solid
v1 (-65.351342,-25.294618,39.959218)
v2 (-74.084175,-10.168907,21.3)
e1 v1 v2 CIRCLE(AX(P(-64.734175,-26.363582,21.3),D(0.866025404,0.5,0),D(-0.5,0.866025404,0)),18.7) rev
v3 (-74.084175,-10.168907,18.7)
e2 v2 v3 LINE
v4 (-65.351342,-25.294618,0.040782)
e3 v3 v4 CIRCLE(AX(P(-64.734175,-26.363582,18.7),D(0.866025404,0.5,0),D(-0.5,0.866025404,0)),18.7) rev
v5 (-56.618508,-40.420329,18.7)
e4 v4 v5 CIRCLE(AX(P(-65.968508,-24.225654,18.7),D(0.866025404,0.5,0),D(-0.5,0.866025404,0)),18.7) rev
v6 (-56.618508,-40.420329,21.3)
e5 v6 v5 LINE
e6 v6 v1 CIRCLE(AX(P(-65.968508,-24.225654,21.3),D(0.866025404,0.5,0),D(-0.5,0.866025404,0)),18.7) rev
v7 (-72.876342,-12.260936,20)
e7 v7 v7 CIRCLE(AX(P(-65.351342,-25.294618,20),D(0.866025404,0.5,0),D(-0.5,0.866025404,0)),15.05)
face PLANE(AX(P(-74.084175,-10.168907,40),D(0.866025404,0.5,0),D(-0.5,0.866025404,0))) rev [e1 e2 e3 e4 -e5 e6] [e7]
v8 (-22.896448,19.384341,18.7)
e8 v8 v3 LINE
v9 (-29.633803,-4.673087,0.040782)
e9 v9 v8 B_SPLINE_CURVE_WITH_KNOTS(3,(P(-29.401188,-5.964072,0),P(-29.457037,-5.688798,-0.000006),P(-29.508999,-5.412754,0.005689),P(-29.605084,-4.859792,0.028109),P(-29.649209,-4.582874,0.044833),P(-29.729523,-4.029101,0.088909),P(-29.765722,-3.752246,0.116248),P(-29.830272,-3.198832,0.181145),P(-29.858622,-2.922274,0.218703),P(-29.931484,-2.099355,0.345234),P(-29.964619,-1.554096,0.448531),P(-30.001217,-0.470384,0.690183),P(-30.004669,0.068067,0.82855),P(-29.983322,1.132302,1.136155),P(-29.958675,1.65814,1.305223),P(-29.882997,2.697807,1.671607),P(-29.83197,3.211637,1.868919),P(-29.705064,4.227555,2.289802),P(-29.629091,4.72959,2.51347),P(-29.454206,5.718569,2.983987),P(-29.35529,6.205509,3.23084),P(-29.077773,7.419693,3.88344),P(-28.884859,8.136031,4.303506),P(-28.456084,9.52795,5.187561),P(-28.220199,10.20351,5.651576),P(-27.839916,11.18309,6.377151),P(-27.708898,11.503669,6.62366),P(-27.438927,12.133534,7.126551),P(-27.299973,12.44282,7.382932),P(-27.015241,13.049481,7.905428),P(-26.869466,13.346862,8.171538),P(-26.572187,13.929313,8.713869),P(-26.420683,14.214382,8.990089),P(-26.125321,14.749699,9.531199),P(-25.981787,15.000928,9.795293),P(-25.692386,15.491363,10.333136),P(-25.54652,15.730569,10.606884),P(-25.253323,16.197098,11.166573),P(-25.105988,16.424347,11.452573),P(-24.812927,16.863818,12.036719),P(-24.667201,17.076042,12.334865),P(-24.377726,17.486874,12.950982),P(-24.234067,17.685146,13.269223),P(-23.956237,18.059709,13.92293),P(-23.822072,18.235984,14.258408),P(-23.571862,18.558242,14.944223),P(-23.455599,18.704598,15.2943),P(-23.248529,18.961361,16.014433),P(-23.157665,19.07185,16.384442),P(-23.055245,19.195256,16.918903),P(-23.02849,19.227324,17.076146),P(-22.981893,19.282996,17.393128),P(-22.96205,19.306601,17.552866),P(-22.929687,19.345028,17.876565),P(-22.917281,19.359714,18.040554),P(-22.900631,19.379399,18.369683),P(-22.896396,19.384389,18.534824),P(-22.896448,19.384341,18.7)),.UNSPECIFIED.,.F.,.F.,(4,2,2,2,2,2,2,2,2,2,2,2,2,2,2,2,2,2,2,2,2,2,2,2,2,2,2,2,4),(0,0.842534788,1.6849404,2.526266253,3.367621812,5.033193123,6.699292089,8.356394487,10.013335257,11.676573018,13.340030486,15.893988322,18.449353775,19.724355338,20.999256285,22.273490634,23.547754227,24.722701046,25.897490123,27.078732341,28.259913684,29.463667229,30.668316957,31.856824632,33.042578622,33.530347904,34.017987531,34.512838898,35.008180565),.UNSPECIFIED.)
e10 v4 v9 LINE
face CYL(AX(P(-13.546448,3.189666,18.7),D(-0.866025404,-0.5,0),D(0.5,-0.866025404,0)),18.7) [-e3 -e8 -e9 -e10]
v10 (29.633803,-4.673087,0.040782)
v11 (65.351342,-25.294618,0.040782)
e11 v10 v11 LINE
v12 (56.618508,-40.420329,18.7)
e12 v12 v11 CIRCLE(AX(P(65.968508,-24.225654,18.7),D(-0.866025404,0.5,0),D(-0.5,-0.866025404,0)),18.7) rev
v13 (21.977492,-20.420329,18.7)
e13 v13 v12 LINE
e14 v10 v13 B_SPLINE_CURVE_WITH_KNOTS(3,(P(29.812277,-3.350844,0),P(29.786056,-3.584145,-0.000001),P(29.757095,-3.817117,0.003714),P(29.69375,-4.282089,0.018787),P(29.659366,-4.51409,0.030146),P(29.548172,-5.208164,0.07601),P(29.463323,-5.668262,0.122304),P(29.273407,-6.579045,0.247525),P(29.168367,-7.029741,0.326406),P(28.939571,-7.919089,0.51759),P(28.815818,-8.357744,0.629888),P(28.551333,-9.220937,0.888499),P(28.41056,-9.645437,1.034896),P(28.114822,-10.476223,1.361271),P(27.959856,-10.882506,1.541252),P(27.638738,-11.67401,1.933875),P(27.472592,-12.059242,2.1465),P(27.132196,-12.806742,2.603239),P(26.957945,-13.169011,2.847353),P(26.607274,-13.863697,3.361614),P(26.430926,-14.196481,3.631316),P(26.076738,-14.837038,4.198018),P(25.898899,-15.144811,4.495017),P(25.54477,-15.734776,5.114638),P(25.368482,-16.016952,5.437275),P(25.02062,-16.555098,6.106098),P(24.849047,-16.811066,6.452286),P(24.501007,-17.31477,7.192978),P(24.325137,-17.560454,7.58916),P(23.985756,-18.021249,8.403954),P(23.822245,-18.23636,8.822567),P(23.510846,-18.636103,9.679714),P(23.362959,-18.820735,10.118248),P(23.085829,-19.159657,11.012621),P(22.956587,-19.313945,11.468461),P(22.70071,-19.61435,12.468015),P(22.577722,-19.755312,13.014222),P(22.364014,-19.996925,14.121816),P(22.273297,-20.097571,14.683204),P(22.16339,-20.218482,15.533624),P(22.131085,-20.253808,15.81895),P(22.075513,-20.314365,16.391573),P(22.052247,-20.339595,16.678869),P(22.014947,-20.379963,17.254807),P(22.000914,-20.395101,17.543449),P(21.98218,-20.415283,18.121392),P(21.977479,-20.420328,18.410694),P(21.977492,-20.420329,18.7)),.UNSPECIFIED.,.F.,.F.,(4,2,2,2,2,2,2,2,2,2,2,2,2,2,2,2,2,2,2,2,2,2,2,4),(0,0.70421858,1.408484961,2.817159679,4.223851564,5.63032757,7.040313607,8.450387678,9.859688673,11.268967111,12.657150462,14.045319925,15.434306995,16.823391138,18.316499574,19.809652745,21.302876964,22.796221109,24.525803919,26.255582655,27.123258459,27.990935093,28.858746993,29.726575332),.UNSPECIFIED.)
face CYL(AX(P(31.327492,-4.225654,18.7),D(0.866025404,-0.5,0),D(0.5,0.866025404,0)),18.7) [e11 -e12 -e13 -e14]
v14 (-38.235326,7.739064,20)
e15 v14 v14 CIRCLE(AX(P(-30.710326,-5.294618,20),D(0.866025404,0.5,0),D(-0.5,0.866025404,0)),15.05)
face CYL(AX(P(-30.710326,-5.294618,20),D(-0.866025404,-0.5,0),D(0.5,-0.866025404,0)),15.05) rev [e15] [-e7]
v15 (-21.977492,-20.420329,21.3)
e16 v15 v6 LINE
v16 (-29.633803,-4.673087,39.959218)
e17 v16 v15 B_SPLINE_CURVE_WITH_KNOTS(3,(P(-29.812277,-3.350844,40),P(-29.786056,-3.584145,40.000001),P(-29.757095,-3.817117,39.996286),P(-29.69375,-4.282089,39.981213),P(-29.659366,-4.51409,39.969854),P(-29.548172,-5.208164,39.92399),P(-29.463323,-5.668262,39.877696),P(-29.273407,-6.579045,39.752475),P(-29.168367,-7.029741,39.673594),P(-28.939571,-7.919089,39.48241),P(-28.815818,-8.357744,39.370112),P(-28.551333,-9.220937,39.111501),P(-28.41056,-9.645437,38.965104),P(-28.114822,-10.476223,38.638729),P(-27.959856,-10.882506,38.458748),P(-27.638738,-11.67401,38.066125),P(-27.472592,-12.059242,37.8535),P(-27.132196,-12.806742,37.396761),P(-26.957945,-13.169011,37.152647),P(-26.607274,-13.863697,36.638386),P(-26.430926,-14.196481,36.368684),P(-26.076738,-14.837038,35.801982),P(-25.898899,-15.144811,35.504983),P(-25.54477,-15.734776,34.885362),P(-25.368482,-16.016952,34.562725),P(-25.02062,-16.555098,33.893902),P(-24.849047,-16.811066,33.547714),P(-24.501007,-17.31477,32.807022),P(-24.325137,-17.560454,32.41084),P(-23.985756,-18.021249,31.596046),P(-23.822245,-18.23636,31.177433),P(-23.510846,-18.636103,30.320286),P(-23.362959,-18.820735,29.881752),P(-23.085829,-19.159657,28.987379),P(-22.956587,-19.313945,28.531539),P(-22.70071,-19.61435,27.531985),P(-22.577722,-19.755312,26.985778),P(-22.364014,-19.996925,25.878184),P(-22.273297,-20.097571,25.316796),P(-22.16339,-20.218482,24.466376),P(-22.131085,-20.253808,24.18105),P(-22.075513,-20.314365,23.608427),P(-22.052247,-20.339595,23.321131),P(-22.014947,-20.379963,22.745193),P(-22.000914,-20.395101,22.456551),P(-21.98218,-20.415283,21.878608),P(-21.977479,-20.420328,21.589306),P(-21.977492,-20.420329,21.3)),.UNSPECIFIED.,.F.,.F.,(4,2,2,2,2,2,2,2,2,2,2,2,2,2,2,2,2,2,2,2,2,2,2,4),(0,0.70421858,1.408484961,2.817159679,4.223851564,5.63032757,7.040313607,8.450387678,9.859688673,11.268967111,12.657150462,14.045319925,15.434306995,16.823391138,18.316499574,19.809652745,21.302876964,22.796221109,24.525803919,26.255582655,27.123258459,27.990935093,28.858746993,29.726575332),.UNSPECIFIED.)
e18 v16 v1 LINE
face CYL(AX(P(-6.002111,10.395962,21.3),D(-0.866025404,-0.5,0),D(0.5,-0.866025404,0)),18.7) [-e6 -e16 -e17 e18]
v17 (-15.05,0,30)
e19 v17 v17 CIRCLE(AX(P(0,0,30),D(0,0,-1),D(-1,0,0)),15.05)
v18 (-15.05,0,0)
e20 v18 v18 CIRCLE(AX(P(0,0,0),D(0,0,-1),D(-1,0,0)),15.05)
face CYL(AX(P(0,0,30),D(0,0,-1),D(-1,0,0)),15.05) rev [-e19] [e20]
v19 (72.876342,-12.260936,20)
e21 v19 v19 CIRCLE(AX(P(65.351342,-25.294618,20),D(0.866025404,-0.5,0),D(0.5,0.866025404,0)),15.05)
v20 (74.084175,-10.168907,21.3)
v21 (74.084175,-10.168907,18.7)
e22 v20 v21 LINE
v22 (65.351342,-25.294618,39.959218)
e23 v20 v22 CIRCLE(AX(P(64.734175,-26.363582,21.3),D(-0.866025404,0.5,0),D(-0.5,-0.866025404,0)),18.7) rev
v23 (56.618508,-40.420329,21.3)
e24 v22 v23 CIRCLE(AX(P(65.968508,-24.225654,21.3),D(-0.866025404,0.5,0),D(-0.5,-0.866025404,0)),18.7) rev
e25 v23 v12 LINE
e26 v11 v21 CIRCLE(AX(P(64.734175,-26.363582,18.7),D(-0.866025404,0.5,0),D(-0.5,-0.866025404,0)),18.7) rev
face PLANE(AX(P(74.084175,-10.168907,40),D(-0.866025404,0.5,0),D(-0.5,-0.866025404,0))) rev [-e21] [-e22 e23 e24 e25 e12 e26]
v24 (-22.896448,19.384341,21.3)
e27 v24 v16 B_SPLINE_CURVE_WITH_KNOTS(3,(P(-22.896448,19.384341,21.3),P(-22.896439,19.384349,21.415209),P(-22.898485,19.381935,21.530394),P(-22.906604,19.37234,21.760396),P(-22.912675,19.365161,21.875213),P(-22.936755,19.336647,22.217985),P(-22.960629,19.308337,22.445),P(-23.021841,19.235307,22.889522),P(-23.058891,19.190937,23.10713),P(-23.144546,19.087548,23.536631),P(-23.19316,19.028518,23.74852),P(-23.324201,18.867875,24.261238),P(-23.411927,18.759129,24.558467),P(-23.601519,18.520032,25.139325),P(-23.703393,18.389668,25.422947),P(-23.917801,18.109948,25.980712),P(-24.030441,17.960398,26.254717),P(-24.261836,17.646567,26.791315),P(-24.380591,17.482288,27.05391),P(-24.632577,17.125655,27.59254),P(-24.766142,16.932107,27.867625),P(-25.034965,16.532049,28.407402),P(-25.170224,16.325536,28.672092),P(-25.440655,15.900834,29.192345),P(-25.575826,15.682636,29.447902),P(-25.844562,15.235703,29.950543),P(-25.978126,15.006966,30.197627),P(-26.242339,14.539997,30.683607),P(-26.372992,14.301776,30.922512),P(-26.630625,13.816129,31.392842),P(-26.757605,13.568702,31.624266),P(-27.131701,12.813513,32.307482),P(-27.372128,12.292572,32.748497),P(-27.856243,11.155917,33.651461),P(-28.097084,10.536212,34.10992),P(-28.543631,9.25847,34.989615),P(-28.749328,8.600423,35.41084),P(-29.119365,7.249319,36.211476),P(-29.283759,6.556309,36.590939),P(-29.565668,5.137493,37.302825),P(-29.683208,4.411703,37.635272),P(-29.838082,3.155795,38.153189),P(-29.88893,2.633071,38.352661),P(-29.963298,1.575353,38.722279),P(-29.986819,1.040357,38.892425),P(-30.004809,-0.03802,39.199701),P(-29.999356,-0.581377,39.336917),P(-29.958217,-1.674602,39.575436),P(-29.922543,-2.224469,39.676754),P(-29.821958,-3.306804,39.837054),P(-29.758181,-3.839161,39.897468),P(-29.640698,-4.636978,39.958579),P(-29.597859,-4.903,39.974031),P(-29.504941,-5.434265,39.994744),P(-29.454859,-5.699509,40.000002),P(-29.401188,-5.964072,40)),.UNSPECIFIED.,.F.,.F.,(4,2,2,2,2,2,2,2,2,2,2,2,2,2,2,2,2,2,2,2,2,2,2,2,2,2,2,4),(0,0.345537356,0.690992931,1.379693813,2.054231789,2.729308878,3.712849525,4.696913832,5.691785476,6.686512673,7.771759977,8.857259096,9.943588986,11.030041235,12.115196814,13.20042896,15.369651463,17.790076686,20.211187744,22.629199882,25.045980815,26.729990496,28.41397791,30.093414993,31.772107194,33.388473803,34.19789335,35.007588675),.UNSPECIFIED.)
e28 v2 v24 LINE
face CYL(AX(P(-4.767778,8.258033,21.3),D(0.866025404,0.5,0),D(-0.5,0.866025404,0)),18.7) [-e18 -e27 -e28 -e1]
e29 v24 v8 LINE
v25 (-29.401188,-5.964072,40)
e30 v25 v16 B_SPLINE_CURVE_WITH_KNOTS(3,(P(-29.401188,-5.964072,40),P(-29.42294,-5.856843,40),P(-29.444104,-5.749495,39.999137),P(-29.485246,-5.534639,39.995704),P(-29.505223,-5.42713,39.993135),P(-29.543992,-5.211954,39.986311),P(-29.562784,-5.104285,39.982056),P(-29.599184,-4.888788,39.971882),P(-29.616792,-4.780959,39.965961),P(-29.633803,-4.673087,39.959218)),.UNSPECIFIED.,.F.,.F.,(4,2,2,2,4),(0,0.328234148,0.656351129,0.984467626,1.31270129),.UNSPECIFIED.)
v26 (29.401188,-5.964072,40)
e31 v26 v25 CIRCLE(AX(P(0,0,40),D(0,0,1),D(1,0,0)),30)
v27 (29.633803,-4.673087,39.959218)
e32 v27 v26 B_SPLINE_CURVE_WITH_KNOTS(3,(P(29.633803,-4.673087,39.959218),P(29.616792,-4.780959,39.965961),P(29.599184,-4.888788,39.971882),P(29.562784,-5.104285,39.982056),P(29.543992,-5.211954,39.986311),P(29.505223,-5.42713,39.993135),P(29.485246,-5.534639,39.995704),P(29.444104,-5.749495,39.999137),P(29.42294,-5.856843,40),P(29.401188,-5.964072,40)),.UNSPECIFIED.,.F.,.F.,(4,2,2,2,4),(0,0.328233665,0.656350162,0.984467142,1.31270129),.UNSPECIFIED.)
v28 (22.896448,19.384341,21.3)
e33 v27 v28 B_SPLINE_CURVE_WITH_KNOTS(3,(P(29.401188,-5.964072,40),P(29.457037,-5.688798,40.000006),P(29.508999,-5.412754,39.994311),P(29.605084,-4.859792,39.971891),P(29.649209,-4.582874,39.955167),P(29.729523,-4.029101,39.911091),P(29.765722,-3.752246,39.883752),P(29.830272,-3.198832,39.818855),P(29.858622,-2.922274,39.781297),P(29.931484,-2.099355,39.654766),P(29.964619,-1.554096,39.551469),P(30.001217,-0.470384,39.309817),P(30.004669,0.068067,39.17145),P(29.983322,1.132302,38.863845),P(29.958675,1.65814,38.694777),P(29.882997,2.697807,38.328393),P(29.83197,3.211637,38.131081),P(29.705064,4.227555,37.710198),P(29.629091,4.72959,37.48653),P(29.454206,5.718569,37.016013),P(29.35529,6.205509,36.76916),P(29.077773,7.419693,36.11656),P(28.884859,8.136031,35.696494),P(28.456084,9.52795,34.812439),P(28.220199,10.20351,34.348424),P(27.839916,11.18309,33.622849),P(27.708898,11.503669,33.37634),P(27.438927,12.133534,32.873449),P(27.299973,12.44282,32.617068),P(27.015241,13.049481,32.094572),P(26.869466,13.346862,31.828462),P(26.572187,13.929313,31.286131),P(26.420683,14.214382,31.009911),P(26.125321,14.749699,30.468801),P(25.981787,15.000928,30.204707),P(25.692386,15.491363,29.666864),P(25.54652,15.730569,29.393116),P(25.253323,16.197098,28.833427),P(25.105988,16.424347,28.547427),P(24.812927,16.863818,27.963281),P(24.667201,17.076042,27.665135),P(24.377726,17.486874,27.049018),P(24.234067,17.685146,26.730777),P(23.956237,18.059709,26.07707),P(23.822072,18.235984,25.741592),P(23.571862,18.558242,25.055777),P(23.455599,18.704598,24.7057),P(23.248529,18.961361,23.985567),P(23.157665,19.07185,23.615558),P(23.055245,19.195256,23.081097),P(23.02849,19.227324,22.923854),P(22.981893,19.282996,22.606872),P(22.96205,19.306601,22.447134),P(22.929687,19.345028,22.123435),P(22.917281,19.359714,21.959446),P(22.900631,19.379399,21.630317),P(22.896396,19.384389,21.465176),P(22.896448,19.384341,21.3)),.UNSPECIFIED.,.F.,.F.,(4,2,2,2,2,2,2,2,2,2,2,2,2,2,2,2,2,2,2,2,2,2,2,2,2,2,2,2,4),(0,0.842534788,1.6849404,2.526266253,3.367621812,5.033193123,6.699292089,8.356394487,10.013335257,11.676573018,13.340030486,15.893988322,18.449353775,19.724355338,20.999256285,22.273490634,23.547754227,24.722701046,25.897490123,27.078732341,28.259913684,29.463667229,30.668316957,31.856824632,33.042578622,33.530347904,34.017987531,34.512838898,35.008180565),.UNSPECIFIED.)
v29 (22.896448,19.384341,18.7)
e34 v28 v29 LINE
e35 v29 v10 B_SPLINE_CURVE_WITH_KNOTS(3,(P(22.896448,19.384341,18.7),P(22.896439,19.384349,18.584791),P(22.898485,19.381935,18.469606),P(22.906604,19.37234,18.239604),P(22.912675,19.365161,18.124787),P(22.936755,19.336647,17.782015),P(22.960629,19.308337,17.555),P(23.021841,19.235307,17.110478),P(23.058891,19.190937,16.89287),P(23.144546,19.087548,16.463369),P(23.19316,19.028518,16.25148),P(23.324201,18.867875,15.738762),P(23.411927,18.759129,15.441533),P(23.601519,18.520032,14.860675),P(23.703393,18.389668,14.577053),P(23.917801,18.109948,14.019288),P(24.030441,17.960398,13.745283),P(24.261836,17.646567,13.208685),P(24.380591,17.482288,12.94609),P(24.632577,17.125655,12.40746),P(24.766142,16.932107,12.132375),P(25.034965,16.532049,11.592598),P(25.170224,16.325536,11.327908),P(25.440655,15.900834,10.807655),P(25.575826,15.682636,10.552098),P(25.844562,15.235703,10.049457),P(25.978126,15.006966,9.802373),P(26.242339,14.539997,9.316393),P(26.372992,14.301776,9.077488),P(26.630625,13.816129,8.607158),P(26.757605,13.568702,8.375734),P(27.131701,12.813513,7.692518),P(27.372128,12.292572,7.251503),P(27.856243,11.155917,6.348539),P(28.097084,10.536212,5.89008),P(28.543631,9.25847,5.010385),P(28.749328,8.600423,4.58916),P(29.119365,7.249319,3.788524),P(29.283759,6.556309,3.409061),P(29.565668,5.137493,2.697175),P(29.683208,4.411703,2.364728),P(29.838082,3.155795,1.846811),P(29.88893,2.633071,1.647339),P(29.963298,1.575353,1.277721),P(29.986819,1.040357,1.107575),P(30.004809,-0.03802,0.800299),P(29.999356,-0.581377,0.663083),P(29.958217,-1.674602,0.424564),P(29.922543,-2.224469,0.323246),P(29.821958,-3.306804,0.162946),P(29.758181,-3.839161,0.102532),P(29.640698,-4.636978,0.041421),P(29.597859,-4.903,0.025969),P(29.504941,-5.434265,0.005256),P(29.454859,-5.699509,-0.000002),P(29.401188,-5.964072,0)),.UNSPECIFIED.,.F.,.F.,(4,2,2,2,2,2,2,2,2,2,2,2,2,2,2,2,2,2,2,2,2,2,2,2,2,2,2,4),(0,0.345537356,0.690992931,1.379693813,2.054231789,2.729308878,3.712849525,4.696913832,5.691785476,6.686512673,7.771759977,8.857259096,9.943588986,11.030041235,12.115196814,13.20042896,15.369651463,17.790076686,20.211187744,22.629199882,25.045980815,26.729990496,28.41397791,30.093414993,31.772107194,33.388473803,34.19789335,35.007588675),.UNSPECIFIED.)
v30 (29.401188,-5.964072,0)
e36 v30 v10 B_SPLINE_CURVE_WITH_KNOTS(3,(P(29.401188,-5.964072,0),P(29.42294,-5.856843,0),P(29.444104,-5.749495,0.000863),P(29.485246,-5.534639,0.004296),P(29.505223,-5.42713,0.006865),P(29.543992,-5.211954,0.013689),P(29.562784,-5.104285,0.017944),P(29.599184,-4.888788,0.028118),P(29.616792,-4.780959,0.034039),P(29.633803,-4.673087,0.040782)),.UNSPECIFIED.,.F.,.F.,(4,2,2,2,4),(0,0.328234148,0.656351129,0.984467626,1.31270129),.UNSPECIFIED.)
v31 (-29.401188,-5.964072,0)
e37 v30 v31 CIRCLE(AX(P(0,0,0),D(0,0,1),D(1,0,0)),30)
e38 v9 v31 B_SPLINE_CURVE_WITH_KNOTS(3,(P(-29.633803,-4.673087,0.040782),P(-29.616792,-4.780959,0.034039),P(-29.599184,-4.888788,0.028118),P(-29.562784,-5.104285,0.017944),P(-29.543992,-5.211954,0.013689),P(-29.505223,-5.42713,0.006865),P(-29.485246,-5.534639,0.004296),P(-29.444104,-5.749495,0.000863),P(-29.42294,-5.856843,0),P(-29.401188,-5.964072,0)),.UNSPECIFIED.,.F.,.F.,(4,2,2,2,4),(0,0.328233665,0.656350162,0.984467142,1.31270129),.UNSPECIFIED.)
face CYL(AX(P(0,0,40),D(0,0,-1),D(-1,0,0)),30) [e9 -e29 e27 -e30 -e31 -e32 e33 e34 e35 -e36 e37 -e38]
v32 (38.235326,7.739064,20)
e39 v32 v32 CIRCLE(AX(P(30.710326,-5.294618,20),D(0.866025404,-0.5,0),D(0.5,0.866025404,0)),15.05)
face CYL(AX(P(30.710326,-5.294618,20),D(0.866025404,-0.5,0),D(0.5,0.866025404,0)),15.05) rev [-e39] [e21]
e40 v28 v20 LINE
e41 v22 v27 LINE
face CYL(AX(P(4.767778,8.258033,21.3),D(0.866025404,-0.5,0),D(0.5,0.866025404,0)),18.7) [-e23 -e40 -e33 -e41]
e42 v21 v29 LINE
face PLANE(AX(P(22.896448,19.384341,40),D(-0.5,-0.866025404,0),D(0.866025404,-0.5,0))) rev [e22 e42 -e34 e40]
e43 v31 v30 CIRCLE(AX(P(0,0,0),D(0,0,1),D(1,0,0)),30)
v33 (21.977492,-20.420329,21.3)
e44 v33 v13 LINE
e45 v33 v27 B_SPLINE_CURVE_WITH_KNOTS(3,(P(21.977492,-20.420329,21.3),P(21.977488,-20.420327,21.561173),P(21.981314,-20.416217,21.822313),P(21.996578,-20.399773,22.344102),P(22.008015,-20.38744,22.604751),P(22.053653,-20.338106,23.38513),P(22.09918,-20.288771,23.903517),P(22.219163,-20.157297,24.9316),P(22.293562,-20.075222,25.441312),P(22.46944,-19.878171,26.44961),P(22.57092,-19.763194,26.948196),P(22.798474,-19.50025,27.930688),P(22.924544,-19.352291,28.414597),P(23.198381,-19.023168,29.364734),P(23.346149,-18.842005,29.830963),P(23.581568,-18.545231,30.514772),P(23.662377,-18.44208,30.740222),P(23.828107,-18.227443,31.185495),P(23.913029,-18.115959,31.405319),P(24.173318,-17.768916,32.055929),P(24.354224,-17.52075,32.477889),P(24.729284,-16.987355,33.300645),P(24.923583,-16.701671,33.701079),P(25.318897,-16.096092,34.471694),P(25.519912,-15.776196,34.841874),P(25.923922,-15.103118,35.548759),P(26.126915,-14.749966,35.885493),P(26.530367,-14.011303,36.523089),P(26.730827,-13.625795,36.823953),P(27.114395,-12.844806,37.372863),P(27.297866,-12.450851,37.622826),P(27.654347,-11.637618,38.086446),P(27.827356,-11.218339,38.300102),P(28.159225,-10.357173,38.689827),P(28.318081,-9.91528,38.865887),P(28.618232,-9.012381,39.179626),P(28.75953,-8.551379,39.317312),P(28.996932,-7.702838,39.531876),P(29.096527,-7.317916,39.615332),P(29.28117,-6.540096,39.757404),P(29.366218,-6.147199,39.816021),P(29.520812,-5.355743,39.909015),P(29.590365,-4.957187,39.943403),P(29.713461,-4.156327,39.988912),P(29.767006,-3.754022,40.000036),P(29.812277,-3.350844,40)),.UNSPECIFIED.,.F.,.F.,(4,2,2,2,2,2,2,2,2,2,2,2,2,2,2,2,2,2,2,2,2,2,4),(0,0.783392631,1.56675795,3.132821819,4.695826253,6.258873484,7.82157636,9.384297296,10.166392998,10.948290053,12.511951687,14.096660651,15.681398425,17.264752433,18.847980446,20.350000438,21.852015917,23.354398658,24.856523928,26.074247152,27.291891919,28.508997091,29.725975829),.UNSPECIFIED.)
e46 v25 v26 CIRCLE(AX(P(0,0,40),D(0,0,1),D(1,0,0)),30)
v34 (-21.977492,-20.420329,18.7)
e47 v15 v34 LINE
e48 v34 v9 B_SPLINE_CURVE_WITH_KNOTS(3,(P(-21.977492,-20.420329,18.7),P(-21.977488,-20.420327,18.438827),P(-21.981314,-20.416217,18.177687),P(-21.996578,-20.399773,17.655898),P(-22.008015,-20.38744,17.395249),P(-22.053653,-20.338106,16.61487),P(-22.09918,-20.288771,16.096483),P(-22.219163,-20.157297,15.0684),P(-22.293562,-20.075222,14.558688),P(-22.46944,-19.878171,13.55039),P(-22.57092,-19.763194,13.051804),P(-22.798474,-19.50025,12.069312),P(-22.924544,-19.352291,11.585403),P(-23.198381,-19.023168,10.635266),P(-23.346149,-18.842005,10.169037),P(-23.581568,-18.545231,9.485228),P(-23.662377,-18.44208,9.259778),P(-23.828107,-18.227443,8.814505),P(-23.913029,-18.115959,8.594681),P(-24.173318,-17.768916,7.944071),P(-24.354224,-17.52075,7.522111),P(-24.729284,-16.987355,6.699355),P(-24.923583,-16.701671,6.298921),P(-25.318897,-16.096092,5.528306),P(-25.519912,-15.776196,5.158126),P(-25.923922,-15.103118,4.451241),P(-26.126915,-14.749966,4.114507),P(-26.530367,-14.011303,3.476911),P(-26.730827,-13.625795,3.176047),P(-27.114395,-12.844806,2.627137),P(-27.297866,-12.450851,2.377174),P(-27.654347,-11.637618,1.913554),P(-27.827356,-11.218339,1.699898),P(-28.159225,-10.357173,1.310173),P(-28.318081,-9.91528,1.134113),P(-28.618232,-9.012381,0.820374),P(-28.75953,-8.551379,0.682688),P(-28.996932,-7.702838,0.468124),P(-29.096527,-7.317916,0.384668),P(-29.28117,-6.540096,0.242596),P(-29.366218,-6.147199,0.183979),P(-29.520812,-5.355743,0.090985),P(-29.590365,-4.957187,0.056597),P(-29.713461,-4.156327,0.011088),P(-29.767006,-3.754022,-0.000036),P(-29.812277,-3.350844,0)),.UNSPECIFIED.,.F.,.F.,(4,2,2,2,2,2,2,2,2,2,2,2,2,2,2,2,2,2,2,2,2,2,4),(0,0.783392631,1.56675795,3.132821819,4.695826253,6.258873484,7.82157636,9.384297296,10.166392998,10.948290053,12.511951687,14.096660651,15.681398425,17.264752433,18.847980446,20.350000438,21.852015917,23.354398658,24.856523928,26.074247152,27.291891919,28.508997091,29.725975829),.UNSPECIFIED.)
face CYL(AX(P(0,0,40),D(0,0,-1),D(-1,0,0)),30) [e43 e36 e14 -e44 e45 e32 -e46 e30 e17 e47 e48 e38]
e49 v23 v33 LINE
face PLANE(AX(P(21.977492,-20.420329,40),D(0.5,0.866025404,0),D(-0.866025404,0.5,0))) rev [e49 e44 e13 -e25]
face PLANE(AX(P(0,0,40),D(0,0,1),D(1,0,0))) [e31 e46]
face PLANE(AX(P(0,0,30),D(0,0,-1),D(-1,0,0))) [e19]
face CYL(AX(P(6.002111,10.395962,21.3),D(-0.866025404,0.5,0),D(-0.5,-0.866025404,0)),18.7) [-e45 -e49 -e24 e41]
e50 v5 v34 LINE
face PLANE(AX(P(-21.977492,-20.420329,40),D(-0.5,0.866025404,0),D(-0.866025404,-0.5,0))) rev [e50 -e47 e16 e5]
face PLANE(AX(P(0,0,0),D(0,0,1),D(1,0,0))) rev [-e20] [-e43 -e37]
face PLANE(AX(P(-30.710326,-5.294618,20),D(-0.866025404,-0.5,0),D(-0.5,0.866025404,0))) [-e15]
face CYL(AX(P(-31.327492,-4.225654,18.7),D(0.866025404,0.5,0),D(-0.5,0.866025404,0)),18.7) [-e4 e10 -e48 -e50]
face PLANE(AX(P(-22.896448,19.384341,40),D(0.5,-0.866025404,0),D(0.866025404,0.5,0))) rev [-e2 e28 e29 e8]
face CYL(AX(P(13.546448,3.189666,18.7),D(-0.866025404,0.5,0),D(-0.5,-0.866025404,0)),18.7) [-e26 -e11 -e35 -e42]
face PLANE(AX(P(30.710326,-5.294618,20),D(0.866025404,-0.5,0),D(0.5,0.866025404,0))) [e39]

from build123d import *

# Parameters (mm, degrees)
BOSS_EXTRUDE1_DEPTH = 40
SKETCH2_R           = 15.049999999999999
CUT_EXTRUDE1_DEPTH  = 40
FILLET3_R           = 18.700000000000003
FILLET4_R           = 18.7
FILLET5_R           = 18.7
FILLET6_R           = 18.7
SKETCH4_R           = 15.049999999999999
CUT_EXTRUDE2_DEPTH  = 30


with BuildPart() as part:
    # Sketch1 → Boss-Extrude1 (new body)
    with BuildSketch(Plane.XY):
        with BuildLine():
            Line((-21.97749224689504, -20.420328952729147), (-56.618508398272695, -40.420328952728944))
            Line((-56.618508398272695, -40.420328952728944), (-74.08417498363409, -10.168907038824594))
            Line((-74.08417498363409, -10.168907038824594), (-22.896447841875652, 19.38434100567434))
            ThreePointArc((-22.896447841875652, 19.38434100567434), (1.84e-15, 30), (22.89644784187566, 19.384341005674337))
            Line((22.89644784187566, 19.384341005674337), (74.08417498363407, -10.168907038825086))
            Line((74.08417498363407, -10.168907038825086), (56.61850839827255, -40.42032895272918))
            Line((56.61850839827255, -40.42032895272918), (21.97749224689504, -20.42032895272915))
            ThreePointArc((21.97749224689504, -20.42032895272915), (-4.82e-15, -29.999999999999996), (-21.97749224689504, -20.420328952729147))
        make_face()
    extrude(amount=BOSS_EXTRUDE1_DEPTH)

    # Sketch2 → Cut-Extrude1 (cut)
    with BuildSketch(Plane(origin=(59.96639714989796, -34.62161553682567, 0), x_dir=(0, 0, -1), z_dir=(0.8660254037844382, -0.5000000000000009, 0))):
        with Locations(Location((-20, 10.769889082110701, 0), (0, 0, 90))):
            Circle(SKETCH2_R)
    cut_extrude1 = extrude(amount=-CUT_EXTRUDE1_DEPTH, mode=Mode.SUBTRACT)

    # Mirror1: Cut-Extrude1 across plane
    add(cut_extrude1.mirror(Plane(origin=(0, 0, 0), x_dir=(0, 0, 1), z_dir=(1, 0, 0))), mode=Mode.SUBTRACT)

    # Fillet3
    fillet3_edges = [part.edges().sort_by_distance(p)[0] for p in [
        (39.298000322583796, -30.420328952729164, 40),
    ]]
    fillet(fillet3_edges, radius=FILLET3_R)

    # Fillet4
    # the kernel refuses this fillet: 18.7 mm, written as the material it takes off along each edge
    with BuildSketch(Plane(origin=(-17.590239785046823, 42.759341005674386, 40), x_dir=(0, 0, -1), z_dir=(0.866025403784438, -0.5000000000000011, 0))) as fillet4_piece_1_section:
        with BuildLine():
            CenterArc((FILLET4_R, -FILLET4_R), FILLET4_R, 90, 89.99999999999997)
            Line((0, -FILLET4_R), (0, 0))
            Line((0, 0), (FILLET4_R, 0))
        make_face()
    fillet4_piece_1 = extrude(amount=152.6064960889987, mode=Mode.PRIVATE)
    fillet4_piece_1 = fillet4_piece_1 - Plane(origin=(2.66e-15, 5.33e-15, 35.12262503865641), x_dir=(-0.7632149280625219, 0.6461447001891446, 0), z_dir=(0, 0, -1)) * Cylinder(29.999999999999996, 381, mode=Mode.PRIVATE)
    add(fillet4_piece_1, mode=Mode.SUBTRACT)
    with BuildSketch(Plane(origin=(18.509195380027606, 2.9546710472706206, 0), x_dir=(-0.49999999999999495, 0.8660254037844416, 0), z_dir=(-0.8660254037844416, -0.499999999999995, 0))) as fillet4_piece_2_section:
        with BuildLine():
            CenterArc((FILLET4_R, -FILLET4_R), FILLET4_R, 90, 90)
            Line((-2.49e-15, -FILLET4_R), (0, 0))
            Line((0, 0), (FILLET4_R, 0))
        make_face()
    fillet4_piece_2 = extrude(amount=133.50000000000003, mode=Mode.PRIVATE)
    fillet4_piece_2 = fillet4_piece_2 - Plane(origin=(8.9e-16, 5.33e-15, 4.238028125601217), x_dir=(0.7325830748965012, -0.6806776317576385, 0), z_dir=(0, 0, -1)) * Cylinder(30, 342, mode=Mode.PRIVATE)
    add(fillet4_piece_2, mode=Mode.SUBTRACT)
    with BuildSketch(Plane(origin=(97.10519602519503, -63.795328952729214, 0), x_dir=(0.5000000000000009, 0.8660254037844382, 0), z_dir=(-0.8660254037844382, 0.5000000000000009, 0))) as fillet4_piece_3_section:
        with BuildLine():
            CenterArc((FILLET4_R, -FILLET4_R), FILLET4_R, 90, 90)
            Line((0, -FILLET4_R), (0, 0))
            Line((0, 0), (FILLET4_R, 0))
        make_face()
    fillet4_piece_3 = extrude(amount=133.49999999999997, mode=Mode.PRIVATE)
    fillet4_piece_3 = fillet4_piece_3 - Plane(origin=(8.9e-16, 5.33e-15, 4.238027498797153), x_dir=(0.7325830748965012, -0.6806776317576385, 0), z_dir=(0, 0, -1)) * Cylinder(30, 342, mode=Mode.PRIVATE)
    add(fillet4_piece_3, mode=Mode.SUBTRACT)

    # Fillet5
    # the kernel refuses this fillet: 18.7 mm, written as the material it takes off along each edge
    with BuildSketch(Plane(origin=(-114.57086261055673, -33.54390703882436, 0), x_dir=(0.4999999999999949, -0.8660254037844416, 0), z_dir=(0.8660254037844416, 0.49999999999999484, 0))) as fillet5_piece_1_section:
        with BuildLine():
            CenterArc((FILLET5_R, -FILLET5_R), FILLET5_R, 90, 90)
            Line((0, -FILLET5_R), (0, 0))
            Line((0, 0), (FILLET5_R, 0))
        make_face()
    fillet5_piece_1 = extrude(amount=152.6064960889985, mode=Mode.PRIVATE)
    fillet5_piece_1 = fillet5_piece_1 - Plane(origin=(8.9e-16, 5.33e-15, 4.361975698368192), x_dir=(0.7325830748965012, -0.6806776317576385, 0), z_dir=(0, 0, -1)) * Cylinder(30, 381, mode=Mode.PRIVATE)
    with BuildSketch(Plane(origin=(18.509195380027606, 2.954671047270619, 40), x_dir=(1e-17, -2e-17, -1), z_dir=(-0.8660254037844416, -0.499999999999995, 0))) as fillet5_piece_2_section:
        with BuildLine():
            CenterArc((FILLET5_R, -FILLET5_R), FILLET5_R, 90, 90)
            Line((-4.8e-16, -FILLET5_R), (0, 0))
            Line((0, 0), (FILLET5_R, 0))
        make_face()
    fillet5_piece_2 = extrude(amount=133.50000000000003, mode=Mode.PRIVATE)
    fillet5_piece_2 = fillet5_piece_2 - Plane(origin=(8.9e-16, 5.33e-15, 35.76197179193409), x_dir=(0.7325830748965012, -0.6806776317576385, 0), z_dir=(0, 0, -1)) * Cylinder(30, 342, mode=Mode.PRIVATE)
    with BuildSketch(Plane(origin=(-17.590239785046823, 42.759341005674386, 0), x_dir=(0, 0, 1), z_dir=(0.866025403784438, -0.5000000000000011, 0))) as fillet5_piece_3_section:
        with BuildLine():
            CenterArc((FILLET5_R, FILLET5_R), FILLET5_R, 180.00000000000003, 90)
            Line((-3.55e-15, FILLET5_R), (0, 0))
            Line((0, 0), (FILLET5_R, 0))
        make_face()
    fillet5_piece_3 = extrude(amount=152.6064960889987, mode=Mode.PRIVATE)
    fillet5_piece_3 = fillet5_piece_3 - Plane(origin=(8.9e-16, 5.33e-15, 4.877369917658315), x_dir=(0.7325830748965012, -0.6806776317576385, 0), z_dir=(0, 0, -1)) * Cylinder(30, 381, mode=Mode.PRIVATE)
    add([fillet5_piece_1, fillet5_piece_2, fillet5_piece_3], mode=Mode.SUBTRACT)

    # Fillet6
    # the kernel refuses this fillet: 18.7 mm, written as the material it takes off along each edge
    with BuildSketch(Plane(origin=(-114.57086261055673, -33.54390703882436, 40), x_dir=(0.4999999999999949, -0.8660254037844416, 0), z_dir=(0.8660254037844416, 0.49999999999999484, 0))) as fillet6_piece_1_section:
        with BuildLine():
            CenterArc((FILLET6_R, FILLET6_R), FILLET6_R, 180, 90)
            Line((0, FILLET6_R), (0, 0))
            Line((0, 0), (FILLET6_R, 0))
        make_face()
    fillet6_piece_1 = extrude(amount=152.6064960889985, mode=Mode.PRIVATE)
    fillet6_piece_1 = fillet6_piece_1 - Plane(origin=(8.9e-16, 5.33e-15, 35.63802430163197), x_dir=(0.7325830748965012, -0.6806776317576385, 0), z_dir=(0, 0, -1)) * Cylinder(30, 381, mode=Mode.PRIVATE)
    add(fillet6_piece_1, mode=Mode.SUBTRACT)

    # Sketch4 → Cut-Extrude2 (cut)
    with BuildSketch(Plane(origin=(0, 0, 0), x_dir=(-1, 0, 0), z_dir=(0, 0, -1))):
        Circle(SKETCH4_R)
    extrude(amount=-CUT_EXTRUDE2_DEPTH, mode=Mode.SUBTRACT)


solid = part.part
